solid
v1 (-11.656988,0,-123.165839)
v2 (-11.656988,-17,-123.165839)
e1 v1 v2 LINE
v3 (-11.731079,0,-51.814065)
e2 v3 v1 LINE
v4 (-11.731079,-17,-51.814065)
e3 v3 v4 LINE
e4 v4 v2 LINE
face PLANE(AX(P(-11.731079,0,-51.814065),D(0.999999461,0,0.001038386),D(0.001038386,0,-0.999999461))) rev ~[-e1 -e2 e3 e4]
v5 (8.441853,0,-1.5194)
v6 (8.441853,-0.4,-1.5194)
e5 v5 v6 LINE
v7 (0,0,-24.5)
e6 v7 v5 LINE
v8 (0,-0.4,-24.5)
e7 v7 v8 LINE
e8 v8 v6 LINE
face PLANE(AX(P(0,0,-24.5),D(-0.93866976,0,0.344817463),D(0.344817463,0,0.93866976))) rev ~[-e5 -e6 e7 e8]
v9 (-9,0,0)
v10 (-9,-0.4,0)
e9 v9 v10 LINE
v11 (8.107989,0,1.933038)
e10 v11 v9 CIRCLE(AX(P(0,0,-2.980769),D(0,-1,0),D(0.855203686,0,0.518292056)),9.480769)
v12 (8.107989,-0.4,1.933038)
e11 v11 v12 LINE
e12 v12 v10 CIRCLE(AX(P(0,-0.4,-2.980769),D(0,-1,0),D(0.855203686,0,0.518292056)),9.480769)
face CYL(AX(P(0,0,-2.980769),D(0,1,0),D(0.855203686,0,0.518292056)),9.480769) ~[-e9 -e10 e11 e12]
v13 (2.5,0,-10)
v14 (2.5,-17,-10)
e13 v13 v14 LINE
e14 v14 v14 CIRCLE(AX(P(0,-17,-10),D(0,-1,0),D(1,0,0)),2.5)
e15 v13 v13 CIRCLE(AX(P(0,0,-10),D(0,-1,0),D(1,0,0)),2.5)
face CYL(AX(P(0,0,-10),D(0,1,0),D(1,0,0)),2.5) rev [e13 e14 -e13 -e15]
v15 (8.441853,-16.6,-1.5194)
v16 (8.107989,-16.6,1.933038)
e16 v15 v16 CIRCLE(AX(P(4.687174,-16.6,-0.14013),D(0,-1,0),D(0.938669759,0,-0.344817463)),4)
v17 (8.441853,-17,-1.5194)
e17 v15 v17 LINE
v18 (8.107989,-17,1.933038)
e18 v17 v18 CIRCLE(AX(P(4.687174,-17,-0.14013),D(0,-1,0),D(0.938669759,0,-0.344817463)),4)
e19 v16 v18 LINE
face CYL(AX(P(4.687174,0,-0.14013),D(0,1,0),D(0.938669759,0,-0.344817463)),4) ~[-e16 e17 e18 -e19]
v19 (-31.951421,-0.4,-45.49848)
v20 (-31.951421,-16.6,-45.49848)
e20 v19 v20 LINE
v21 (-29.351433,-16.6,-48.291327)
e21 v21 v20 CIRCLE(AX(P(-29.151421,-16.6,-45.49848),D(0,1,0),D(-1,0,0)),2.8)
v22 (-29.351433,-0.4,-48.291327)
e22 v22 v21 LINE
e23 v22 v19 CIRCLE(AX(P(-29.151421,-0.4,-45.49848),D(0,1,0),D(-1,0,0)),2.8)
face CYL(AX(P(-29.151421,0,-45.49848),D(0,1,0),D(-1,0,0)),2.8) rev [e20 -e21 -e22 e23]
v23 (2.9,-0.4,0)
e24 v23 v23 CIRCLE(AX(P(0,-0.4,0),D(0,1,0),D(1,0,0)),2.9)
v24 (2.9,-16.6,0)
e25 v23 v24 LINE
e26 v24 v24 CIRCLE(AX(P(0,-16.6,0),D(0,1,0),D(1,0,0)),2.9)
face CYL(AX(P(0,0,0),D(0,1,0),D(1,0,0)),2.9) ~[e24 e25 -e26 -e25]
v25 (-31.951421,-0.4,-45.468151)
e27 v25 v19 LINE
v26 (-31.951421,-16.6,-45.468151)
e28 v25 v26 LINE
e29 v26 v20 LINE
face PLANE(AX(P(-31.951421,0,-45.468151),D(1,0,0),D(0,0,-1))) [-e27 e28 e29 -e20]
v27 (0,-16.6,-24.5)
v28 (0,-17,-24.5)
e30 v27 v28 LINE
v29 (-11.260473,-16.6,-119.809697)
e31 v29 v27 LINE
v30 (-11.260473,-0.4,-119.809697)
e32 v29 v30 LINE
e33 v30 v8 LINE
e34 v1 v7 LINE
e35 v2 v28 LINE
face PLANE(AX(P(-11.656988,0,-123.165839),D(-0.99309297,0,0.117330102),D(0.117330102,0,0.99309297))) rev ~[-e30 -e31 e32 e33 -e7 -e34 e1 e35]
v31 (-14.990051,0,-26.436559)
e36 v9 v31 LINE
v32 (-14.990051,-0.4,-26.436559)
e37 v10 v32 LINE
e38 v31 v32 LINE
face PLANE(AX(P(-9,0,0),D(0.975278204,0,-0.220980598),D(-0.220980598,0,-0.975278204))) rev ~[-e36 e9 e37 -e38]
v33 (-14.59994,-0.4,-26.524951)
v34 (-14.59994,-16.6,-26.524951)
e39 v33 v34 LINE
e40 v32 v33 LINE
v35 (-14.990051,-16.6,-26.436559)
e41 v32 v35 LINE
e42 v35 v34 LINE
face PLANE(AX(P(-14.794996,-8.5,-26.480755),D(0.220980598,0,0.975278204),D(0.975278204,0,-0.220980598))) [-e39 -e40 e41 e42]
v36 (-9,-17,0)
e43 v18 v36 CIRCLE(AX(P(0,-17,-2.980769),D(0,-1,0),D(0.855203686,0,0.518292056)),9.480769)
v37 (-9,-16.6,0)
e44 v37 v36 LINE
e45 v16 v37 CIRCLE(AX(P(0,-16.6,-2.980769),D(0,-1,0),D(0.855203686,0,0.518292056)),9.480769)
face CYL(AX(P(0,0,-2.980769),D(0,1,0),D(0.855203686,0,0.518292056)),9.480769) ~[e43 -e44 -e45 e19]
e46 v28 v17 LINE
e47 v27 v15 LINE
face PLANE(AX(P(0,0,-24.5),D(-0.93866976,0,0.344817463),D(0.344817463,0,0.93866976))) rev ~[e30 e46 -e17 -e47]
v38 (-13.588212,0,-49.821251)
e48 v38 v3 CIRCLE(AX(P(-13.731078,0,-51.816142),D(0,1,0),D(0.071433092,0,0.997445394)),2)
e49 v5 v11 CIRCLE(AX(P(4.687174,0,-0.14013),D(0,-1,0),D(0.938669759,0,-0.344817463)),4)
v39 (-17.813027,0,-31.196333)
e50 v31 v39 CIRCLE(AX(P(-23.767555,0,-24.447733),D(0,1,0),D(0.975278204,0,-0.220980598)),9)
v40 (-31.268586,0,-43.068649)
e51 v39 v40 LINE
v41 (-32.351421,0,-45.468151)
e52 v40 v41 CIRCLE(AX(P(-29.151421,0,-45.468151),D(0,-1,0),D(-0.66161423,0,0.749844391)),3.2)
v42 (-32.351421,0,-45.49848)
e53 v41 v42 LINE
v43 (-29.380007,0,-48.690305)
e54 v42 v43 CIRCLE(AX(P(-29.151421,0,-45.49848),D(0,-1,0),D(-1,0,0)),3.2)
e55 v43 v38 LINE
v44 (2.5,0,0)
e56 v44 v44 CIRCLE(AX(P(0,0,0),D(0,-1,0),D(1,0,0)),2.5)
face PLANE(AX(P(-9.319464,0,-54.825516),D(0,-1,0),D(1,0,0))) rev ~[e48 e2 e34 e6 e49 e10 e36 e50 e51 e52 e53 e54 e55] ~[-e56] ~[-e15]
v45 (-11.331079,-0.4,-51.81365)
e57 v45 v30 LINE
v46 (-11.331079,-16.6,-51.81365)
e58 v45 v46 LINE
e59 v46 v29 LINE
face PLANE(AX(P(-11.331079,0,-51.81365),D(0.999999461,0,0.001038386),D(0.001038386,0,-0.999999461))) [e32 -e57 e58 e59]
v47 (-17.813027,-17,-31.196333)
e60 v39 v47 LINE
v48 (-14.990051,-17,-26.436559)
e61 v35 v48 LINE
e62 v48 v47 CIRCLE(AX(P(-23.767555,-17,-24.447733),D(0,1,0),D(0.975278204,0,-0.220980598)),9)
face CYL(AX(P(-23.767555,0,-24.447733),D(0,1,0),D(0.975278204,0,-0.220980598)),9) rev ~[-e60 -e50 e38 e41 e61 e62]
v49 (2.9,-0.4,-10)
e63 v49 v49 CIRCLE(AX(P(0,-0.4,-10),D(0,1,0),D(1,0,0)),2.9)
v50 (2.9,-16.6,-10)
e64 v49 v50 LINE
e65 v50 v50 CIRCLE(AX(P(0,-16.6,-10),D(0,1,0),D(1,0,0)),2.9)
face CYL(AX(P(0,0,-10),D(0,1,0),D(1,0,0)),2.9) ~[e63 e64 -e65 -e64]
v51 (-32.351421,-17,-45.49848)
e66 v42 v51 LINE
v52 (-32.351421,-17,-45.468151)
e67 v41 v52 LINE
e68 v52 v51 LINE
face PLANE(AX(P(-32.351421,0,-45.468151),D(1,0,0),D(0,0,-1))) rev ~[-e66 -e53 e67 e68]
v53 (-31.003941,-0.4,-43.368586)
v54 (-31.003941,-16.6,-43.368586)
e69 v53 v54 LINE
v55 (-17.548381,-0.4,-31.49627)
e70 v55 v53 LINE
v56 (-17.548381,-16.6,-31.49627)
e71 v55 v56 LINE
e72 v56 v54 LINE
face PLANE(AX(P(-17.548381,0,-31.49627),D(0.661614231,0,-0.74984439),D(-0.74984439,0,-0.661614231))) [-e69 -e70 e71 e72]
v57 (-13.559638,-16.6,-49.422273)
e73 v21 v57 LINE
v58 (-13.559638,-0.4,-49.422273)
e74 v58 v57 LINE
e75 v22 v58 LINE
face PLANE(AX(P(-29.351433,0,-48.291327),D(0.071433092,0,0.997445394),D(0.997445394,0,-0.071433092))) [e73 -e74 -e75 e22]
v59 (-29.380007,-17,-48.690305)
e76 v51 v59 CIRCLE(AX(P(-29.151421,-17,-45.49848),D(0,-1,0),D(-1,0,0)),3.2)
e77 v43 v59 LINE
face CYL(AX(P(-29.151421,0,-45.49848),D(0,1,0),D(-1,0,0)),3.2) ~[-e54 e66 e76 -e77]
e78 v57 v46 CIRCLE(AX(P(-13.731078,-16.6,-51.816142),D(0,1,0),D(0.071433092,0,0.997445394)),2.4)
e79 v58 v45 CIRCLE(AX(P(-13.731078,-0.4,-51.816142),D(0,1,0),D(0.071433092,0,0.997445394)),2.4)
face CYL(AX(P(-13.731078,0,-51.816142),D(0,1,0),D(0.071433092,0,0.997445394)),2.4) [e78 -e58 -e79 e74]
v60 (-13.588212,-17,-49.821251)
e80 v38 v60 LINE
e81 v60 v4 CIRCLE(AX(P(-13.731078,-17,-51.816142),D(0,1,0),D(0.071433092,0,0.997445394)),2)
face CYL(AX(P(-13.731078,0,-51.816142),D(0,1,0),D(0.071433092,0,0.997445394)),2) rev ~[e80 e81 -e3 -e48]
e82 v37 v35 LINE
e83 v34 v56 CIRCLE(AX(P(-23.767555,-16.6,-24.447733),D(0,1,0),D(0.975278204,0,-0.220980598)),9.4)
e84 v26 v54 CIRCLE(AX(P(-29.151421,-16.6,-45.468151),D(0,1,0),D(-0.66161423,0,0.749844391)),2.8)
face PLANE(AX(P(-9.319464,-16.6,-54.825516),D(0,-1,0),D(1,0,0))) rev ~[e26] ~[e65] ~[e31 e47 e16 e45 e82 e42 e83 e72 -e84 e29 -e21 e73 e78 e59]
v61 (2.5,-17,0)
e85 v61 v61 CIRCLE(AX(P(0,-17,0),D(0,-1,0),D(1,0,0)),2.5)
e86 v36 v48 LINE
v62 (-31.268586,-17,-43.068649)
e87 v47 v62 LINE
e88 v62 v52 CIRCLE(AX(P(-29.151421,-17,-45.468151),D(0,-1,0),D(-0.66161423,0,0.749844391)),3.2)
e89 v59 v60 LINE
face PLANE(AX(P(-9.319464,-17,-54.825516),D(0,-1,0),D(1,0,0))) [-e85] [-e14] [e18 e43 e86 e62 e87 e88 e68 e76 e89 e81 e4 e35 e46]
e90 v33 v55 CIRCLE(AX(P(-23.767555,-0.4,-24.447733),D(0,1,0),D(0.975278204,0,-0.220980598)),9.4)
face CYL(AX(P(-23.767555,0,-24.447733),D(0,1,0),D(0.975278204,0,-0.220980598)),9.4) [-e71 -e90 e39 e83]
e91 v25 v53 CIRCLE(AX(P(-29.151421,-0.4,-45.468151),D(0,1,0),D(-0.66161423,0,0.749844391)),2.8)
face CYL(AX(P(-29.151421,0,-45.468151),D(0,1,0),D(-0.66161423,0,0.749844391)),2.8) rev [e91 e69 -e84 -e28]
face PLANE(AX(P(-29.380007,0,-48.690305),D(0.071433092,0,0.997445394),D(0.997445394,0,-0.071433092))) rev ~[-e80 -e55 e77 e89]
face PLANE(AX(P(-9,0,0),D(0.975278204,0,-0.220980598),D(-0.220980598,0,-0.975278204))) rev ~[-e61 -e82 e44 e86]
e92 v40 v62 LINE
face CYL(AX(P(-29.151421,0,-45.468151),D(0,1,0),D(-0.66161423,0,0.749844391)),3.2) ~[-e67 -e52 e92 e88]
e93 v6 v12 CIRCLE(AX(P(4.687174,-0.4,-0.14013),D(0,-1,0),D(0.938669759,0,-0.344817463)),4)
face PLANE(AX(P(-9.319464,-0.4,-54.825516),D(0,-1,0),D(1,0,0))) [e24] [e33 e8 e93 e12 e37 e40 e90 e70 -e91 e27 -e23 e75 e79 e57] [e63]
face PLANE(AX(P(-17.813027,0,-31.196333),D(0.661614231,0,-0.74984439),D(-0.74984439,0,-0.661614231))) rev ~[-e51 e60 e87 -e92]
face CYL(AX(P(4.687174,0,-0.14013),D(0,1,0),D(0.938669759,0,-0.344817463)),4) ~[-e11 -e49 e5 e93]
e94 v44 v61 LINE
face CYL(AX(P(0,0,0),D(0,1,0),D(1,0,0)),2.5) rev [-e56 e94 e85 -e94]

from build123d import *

# Parameters (mm, degrees)
F0_R     = 2.5
F1_DEPTH = 17
F2_T     = 0.4


# Not quite as in the source:
# - a shell that OpenCascade refuses in one call is made with other operations: the cavity is built on its own and cut out


with BuildPart() as f1:
    # F0 (on Front) → F1 (new body)
    with BuildSketch(Plane.XZ):
        with BuildLine():
            ThreePointArc((8.4418530872, -1.5193999292), (8.6686009191, 0.2448895048), (8.1079887938, 1.933038145))
            ThreePointArc((8.1079887938, 1.933038145), (-1.0644623598, 6.4400537212), (-9, 0))
            Line((-9, 0), (-14.990051355, -26.4365585686))
            ThreePointArc((-14.990051355, -26.4365585686), (-16.0266215588, -29.0388056628), (-17.8130271161, -31.1963326989))
            Line((-17.8130271161, -31.1963326989), (-31.2685862961, -43.0686485372))
            ThreePointArc((-31.2685862961, -43.0686485372), (-32.0681766379, -44.1518925803), (-32.3514207584, -45.4681505868))
            Line((-32.3514207584, -45.4681505868), (-32.3514207584, -45.4984797908))
            ThreePointArc((-32.3514207584, -45.4984797908), (-31.4935858742, -47.678906944), (-29.3800066519, -48.6903050507))
            Line((-29.3800066519, -48.6903050507), (-13.5882116102, -49.8212509157))
            ThreePointArc((-13.5882116102, -49.8212509157), (-12.2679323329, -50.4526148934), (-11.7310788719, -51.8140649305))
            Line((-11.7310788719, -51.8140649305), (-11.6569881297, -123.1658389017))
            Line((-11.6569881297, -123.1658389017), (0, -24.5))
            Line((0, -24.5), (8.4418530872, -1.5193999292))
        make_face()
        with Locations((0, -10)):
            Circle(F0_R, mode=Mode.SUBTRACT)
        Circle(F0_R, mode=Mode.SUBTRACT)
    extrude(amount=F1_DEPTH)

    # F2: shell of thickness 0.4, made by hand


with BuildPart() as f2_core1:
    # F2_t2: copy of F1
    add(f1.part)

    # the walls: a layer under each face that stays
    f2_faces = [f2_core1.faces().sort_by_distance(p)[0] for p in [
        (-16.0266215588, -8.5, -29.0388056628),
        (-24.5408067061, -8.5, -37.1324906181),
        (-32.0681766379, -8.5, -44.1518925803),
        (-32.3514207584, -8.5, -45.4833151888),
        (-31.4935858742, -8.5, -47.678906944),
        (-21.484109131, -8.5, -49.2557779832),
        (-12.2679323329, -8.5, -50.4526148934),
        (-11.6940335008, -8.5, -87.4899519161),
        (-2.5, -8.5, -10),
        (-2.5, -8.5, 0),
        (-11.8321233546, 0, -15.1109731503),
        (-11.8321233546, -17, -15.1109731503),
    ]]
    thicken(f2_faces, amount=-F2_T, mode=Mode.SUBTRACT)


with BuildPart() as f1_1:
    add(f1.part)

    # what is left inside the walls is the cavity
    f2_cavity = [f2_core1.part.solids().sort_by_distance(p)[0] for p in [
        (-5.634209, -11.2, -72.154379),
    ]]
    add(f2_cavity, mode=Mode.SUBTRACT)


solid = f1_1.part
